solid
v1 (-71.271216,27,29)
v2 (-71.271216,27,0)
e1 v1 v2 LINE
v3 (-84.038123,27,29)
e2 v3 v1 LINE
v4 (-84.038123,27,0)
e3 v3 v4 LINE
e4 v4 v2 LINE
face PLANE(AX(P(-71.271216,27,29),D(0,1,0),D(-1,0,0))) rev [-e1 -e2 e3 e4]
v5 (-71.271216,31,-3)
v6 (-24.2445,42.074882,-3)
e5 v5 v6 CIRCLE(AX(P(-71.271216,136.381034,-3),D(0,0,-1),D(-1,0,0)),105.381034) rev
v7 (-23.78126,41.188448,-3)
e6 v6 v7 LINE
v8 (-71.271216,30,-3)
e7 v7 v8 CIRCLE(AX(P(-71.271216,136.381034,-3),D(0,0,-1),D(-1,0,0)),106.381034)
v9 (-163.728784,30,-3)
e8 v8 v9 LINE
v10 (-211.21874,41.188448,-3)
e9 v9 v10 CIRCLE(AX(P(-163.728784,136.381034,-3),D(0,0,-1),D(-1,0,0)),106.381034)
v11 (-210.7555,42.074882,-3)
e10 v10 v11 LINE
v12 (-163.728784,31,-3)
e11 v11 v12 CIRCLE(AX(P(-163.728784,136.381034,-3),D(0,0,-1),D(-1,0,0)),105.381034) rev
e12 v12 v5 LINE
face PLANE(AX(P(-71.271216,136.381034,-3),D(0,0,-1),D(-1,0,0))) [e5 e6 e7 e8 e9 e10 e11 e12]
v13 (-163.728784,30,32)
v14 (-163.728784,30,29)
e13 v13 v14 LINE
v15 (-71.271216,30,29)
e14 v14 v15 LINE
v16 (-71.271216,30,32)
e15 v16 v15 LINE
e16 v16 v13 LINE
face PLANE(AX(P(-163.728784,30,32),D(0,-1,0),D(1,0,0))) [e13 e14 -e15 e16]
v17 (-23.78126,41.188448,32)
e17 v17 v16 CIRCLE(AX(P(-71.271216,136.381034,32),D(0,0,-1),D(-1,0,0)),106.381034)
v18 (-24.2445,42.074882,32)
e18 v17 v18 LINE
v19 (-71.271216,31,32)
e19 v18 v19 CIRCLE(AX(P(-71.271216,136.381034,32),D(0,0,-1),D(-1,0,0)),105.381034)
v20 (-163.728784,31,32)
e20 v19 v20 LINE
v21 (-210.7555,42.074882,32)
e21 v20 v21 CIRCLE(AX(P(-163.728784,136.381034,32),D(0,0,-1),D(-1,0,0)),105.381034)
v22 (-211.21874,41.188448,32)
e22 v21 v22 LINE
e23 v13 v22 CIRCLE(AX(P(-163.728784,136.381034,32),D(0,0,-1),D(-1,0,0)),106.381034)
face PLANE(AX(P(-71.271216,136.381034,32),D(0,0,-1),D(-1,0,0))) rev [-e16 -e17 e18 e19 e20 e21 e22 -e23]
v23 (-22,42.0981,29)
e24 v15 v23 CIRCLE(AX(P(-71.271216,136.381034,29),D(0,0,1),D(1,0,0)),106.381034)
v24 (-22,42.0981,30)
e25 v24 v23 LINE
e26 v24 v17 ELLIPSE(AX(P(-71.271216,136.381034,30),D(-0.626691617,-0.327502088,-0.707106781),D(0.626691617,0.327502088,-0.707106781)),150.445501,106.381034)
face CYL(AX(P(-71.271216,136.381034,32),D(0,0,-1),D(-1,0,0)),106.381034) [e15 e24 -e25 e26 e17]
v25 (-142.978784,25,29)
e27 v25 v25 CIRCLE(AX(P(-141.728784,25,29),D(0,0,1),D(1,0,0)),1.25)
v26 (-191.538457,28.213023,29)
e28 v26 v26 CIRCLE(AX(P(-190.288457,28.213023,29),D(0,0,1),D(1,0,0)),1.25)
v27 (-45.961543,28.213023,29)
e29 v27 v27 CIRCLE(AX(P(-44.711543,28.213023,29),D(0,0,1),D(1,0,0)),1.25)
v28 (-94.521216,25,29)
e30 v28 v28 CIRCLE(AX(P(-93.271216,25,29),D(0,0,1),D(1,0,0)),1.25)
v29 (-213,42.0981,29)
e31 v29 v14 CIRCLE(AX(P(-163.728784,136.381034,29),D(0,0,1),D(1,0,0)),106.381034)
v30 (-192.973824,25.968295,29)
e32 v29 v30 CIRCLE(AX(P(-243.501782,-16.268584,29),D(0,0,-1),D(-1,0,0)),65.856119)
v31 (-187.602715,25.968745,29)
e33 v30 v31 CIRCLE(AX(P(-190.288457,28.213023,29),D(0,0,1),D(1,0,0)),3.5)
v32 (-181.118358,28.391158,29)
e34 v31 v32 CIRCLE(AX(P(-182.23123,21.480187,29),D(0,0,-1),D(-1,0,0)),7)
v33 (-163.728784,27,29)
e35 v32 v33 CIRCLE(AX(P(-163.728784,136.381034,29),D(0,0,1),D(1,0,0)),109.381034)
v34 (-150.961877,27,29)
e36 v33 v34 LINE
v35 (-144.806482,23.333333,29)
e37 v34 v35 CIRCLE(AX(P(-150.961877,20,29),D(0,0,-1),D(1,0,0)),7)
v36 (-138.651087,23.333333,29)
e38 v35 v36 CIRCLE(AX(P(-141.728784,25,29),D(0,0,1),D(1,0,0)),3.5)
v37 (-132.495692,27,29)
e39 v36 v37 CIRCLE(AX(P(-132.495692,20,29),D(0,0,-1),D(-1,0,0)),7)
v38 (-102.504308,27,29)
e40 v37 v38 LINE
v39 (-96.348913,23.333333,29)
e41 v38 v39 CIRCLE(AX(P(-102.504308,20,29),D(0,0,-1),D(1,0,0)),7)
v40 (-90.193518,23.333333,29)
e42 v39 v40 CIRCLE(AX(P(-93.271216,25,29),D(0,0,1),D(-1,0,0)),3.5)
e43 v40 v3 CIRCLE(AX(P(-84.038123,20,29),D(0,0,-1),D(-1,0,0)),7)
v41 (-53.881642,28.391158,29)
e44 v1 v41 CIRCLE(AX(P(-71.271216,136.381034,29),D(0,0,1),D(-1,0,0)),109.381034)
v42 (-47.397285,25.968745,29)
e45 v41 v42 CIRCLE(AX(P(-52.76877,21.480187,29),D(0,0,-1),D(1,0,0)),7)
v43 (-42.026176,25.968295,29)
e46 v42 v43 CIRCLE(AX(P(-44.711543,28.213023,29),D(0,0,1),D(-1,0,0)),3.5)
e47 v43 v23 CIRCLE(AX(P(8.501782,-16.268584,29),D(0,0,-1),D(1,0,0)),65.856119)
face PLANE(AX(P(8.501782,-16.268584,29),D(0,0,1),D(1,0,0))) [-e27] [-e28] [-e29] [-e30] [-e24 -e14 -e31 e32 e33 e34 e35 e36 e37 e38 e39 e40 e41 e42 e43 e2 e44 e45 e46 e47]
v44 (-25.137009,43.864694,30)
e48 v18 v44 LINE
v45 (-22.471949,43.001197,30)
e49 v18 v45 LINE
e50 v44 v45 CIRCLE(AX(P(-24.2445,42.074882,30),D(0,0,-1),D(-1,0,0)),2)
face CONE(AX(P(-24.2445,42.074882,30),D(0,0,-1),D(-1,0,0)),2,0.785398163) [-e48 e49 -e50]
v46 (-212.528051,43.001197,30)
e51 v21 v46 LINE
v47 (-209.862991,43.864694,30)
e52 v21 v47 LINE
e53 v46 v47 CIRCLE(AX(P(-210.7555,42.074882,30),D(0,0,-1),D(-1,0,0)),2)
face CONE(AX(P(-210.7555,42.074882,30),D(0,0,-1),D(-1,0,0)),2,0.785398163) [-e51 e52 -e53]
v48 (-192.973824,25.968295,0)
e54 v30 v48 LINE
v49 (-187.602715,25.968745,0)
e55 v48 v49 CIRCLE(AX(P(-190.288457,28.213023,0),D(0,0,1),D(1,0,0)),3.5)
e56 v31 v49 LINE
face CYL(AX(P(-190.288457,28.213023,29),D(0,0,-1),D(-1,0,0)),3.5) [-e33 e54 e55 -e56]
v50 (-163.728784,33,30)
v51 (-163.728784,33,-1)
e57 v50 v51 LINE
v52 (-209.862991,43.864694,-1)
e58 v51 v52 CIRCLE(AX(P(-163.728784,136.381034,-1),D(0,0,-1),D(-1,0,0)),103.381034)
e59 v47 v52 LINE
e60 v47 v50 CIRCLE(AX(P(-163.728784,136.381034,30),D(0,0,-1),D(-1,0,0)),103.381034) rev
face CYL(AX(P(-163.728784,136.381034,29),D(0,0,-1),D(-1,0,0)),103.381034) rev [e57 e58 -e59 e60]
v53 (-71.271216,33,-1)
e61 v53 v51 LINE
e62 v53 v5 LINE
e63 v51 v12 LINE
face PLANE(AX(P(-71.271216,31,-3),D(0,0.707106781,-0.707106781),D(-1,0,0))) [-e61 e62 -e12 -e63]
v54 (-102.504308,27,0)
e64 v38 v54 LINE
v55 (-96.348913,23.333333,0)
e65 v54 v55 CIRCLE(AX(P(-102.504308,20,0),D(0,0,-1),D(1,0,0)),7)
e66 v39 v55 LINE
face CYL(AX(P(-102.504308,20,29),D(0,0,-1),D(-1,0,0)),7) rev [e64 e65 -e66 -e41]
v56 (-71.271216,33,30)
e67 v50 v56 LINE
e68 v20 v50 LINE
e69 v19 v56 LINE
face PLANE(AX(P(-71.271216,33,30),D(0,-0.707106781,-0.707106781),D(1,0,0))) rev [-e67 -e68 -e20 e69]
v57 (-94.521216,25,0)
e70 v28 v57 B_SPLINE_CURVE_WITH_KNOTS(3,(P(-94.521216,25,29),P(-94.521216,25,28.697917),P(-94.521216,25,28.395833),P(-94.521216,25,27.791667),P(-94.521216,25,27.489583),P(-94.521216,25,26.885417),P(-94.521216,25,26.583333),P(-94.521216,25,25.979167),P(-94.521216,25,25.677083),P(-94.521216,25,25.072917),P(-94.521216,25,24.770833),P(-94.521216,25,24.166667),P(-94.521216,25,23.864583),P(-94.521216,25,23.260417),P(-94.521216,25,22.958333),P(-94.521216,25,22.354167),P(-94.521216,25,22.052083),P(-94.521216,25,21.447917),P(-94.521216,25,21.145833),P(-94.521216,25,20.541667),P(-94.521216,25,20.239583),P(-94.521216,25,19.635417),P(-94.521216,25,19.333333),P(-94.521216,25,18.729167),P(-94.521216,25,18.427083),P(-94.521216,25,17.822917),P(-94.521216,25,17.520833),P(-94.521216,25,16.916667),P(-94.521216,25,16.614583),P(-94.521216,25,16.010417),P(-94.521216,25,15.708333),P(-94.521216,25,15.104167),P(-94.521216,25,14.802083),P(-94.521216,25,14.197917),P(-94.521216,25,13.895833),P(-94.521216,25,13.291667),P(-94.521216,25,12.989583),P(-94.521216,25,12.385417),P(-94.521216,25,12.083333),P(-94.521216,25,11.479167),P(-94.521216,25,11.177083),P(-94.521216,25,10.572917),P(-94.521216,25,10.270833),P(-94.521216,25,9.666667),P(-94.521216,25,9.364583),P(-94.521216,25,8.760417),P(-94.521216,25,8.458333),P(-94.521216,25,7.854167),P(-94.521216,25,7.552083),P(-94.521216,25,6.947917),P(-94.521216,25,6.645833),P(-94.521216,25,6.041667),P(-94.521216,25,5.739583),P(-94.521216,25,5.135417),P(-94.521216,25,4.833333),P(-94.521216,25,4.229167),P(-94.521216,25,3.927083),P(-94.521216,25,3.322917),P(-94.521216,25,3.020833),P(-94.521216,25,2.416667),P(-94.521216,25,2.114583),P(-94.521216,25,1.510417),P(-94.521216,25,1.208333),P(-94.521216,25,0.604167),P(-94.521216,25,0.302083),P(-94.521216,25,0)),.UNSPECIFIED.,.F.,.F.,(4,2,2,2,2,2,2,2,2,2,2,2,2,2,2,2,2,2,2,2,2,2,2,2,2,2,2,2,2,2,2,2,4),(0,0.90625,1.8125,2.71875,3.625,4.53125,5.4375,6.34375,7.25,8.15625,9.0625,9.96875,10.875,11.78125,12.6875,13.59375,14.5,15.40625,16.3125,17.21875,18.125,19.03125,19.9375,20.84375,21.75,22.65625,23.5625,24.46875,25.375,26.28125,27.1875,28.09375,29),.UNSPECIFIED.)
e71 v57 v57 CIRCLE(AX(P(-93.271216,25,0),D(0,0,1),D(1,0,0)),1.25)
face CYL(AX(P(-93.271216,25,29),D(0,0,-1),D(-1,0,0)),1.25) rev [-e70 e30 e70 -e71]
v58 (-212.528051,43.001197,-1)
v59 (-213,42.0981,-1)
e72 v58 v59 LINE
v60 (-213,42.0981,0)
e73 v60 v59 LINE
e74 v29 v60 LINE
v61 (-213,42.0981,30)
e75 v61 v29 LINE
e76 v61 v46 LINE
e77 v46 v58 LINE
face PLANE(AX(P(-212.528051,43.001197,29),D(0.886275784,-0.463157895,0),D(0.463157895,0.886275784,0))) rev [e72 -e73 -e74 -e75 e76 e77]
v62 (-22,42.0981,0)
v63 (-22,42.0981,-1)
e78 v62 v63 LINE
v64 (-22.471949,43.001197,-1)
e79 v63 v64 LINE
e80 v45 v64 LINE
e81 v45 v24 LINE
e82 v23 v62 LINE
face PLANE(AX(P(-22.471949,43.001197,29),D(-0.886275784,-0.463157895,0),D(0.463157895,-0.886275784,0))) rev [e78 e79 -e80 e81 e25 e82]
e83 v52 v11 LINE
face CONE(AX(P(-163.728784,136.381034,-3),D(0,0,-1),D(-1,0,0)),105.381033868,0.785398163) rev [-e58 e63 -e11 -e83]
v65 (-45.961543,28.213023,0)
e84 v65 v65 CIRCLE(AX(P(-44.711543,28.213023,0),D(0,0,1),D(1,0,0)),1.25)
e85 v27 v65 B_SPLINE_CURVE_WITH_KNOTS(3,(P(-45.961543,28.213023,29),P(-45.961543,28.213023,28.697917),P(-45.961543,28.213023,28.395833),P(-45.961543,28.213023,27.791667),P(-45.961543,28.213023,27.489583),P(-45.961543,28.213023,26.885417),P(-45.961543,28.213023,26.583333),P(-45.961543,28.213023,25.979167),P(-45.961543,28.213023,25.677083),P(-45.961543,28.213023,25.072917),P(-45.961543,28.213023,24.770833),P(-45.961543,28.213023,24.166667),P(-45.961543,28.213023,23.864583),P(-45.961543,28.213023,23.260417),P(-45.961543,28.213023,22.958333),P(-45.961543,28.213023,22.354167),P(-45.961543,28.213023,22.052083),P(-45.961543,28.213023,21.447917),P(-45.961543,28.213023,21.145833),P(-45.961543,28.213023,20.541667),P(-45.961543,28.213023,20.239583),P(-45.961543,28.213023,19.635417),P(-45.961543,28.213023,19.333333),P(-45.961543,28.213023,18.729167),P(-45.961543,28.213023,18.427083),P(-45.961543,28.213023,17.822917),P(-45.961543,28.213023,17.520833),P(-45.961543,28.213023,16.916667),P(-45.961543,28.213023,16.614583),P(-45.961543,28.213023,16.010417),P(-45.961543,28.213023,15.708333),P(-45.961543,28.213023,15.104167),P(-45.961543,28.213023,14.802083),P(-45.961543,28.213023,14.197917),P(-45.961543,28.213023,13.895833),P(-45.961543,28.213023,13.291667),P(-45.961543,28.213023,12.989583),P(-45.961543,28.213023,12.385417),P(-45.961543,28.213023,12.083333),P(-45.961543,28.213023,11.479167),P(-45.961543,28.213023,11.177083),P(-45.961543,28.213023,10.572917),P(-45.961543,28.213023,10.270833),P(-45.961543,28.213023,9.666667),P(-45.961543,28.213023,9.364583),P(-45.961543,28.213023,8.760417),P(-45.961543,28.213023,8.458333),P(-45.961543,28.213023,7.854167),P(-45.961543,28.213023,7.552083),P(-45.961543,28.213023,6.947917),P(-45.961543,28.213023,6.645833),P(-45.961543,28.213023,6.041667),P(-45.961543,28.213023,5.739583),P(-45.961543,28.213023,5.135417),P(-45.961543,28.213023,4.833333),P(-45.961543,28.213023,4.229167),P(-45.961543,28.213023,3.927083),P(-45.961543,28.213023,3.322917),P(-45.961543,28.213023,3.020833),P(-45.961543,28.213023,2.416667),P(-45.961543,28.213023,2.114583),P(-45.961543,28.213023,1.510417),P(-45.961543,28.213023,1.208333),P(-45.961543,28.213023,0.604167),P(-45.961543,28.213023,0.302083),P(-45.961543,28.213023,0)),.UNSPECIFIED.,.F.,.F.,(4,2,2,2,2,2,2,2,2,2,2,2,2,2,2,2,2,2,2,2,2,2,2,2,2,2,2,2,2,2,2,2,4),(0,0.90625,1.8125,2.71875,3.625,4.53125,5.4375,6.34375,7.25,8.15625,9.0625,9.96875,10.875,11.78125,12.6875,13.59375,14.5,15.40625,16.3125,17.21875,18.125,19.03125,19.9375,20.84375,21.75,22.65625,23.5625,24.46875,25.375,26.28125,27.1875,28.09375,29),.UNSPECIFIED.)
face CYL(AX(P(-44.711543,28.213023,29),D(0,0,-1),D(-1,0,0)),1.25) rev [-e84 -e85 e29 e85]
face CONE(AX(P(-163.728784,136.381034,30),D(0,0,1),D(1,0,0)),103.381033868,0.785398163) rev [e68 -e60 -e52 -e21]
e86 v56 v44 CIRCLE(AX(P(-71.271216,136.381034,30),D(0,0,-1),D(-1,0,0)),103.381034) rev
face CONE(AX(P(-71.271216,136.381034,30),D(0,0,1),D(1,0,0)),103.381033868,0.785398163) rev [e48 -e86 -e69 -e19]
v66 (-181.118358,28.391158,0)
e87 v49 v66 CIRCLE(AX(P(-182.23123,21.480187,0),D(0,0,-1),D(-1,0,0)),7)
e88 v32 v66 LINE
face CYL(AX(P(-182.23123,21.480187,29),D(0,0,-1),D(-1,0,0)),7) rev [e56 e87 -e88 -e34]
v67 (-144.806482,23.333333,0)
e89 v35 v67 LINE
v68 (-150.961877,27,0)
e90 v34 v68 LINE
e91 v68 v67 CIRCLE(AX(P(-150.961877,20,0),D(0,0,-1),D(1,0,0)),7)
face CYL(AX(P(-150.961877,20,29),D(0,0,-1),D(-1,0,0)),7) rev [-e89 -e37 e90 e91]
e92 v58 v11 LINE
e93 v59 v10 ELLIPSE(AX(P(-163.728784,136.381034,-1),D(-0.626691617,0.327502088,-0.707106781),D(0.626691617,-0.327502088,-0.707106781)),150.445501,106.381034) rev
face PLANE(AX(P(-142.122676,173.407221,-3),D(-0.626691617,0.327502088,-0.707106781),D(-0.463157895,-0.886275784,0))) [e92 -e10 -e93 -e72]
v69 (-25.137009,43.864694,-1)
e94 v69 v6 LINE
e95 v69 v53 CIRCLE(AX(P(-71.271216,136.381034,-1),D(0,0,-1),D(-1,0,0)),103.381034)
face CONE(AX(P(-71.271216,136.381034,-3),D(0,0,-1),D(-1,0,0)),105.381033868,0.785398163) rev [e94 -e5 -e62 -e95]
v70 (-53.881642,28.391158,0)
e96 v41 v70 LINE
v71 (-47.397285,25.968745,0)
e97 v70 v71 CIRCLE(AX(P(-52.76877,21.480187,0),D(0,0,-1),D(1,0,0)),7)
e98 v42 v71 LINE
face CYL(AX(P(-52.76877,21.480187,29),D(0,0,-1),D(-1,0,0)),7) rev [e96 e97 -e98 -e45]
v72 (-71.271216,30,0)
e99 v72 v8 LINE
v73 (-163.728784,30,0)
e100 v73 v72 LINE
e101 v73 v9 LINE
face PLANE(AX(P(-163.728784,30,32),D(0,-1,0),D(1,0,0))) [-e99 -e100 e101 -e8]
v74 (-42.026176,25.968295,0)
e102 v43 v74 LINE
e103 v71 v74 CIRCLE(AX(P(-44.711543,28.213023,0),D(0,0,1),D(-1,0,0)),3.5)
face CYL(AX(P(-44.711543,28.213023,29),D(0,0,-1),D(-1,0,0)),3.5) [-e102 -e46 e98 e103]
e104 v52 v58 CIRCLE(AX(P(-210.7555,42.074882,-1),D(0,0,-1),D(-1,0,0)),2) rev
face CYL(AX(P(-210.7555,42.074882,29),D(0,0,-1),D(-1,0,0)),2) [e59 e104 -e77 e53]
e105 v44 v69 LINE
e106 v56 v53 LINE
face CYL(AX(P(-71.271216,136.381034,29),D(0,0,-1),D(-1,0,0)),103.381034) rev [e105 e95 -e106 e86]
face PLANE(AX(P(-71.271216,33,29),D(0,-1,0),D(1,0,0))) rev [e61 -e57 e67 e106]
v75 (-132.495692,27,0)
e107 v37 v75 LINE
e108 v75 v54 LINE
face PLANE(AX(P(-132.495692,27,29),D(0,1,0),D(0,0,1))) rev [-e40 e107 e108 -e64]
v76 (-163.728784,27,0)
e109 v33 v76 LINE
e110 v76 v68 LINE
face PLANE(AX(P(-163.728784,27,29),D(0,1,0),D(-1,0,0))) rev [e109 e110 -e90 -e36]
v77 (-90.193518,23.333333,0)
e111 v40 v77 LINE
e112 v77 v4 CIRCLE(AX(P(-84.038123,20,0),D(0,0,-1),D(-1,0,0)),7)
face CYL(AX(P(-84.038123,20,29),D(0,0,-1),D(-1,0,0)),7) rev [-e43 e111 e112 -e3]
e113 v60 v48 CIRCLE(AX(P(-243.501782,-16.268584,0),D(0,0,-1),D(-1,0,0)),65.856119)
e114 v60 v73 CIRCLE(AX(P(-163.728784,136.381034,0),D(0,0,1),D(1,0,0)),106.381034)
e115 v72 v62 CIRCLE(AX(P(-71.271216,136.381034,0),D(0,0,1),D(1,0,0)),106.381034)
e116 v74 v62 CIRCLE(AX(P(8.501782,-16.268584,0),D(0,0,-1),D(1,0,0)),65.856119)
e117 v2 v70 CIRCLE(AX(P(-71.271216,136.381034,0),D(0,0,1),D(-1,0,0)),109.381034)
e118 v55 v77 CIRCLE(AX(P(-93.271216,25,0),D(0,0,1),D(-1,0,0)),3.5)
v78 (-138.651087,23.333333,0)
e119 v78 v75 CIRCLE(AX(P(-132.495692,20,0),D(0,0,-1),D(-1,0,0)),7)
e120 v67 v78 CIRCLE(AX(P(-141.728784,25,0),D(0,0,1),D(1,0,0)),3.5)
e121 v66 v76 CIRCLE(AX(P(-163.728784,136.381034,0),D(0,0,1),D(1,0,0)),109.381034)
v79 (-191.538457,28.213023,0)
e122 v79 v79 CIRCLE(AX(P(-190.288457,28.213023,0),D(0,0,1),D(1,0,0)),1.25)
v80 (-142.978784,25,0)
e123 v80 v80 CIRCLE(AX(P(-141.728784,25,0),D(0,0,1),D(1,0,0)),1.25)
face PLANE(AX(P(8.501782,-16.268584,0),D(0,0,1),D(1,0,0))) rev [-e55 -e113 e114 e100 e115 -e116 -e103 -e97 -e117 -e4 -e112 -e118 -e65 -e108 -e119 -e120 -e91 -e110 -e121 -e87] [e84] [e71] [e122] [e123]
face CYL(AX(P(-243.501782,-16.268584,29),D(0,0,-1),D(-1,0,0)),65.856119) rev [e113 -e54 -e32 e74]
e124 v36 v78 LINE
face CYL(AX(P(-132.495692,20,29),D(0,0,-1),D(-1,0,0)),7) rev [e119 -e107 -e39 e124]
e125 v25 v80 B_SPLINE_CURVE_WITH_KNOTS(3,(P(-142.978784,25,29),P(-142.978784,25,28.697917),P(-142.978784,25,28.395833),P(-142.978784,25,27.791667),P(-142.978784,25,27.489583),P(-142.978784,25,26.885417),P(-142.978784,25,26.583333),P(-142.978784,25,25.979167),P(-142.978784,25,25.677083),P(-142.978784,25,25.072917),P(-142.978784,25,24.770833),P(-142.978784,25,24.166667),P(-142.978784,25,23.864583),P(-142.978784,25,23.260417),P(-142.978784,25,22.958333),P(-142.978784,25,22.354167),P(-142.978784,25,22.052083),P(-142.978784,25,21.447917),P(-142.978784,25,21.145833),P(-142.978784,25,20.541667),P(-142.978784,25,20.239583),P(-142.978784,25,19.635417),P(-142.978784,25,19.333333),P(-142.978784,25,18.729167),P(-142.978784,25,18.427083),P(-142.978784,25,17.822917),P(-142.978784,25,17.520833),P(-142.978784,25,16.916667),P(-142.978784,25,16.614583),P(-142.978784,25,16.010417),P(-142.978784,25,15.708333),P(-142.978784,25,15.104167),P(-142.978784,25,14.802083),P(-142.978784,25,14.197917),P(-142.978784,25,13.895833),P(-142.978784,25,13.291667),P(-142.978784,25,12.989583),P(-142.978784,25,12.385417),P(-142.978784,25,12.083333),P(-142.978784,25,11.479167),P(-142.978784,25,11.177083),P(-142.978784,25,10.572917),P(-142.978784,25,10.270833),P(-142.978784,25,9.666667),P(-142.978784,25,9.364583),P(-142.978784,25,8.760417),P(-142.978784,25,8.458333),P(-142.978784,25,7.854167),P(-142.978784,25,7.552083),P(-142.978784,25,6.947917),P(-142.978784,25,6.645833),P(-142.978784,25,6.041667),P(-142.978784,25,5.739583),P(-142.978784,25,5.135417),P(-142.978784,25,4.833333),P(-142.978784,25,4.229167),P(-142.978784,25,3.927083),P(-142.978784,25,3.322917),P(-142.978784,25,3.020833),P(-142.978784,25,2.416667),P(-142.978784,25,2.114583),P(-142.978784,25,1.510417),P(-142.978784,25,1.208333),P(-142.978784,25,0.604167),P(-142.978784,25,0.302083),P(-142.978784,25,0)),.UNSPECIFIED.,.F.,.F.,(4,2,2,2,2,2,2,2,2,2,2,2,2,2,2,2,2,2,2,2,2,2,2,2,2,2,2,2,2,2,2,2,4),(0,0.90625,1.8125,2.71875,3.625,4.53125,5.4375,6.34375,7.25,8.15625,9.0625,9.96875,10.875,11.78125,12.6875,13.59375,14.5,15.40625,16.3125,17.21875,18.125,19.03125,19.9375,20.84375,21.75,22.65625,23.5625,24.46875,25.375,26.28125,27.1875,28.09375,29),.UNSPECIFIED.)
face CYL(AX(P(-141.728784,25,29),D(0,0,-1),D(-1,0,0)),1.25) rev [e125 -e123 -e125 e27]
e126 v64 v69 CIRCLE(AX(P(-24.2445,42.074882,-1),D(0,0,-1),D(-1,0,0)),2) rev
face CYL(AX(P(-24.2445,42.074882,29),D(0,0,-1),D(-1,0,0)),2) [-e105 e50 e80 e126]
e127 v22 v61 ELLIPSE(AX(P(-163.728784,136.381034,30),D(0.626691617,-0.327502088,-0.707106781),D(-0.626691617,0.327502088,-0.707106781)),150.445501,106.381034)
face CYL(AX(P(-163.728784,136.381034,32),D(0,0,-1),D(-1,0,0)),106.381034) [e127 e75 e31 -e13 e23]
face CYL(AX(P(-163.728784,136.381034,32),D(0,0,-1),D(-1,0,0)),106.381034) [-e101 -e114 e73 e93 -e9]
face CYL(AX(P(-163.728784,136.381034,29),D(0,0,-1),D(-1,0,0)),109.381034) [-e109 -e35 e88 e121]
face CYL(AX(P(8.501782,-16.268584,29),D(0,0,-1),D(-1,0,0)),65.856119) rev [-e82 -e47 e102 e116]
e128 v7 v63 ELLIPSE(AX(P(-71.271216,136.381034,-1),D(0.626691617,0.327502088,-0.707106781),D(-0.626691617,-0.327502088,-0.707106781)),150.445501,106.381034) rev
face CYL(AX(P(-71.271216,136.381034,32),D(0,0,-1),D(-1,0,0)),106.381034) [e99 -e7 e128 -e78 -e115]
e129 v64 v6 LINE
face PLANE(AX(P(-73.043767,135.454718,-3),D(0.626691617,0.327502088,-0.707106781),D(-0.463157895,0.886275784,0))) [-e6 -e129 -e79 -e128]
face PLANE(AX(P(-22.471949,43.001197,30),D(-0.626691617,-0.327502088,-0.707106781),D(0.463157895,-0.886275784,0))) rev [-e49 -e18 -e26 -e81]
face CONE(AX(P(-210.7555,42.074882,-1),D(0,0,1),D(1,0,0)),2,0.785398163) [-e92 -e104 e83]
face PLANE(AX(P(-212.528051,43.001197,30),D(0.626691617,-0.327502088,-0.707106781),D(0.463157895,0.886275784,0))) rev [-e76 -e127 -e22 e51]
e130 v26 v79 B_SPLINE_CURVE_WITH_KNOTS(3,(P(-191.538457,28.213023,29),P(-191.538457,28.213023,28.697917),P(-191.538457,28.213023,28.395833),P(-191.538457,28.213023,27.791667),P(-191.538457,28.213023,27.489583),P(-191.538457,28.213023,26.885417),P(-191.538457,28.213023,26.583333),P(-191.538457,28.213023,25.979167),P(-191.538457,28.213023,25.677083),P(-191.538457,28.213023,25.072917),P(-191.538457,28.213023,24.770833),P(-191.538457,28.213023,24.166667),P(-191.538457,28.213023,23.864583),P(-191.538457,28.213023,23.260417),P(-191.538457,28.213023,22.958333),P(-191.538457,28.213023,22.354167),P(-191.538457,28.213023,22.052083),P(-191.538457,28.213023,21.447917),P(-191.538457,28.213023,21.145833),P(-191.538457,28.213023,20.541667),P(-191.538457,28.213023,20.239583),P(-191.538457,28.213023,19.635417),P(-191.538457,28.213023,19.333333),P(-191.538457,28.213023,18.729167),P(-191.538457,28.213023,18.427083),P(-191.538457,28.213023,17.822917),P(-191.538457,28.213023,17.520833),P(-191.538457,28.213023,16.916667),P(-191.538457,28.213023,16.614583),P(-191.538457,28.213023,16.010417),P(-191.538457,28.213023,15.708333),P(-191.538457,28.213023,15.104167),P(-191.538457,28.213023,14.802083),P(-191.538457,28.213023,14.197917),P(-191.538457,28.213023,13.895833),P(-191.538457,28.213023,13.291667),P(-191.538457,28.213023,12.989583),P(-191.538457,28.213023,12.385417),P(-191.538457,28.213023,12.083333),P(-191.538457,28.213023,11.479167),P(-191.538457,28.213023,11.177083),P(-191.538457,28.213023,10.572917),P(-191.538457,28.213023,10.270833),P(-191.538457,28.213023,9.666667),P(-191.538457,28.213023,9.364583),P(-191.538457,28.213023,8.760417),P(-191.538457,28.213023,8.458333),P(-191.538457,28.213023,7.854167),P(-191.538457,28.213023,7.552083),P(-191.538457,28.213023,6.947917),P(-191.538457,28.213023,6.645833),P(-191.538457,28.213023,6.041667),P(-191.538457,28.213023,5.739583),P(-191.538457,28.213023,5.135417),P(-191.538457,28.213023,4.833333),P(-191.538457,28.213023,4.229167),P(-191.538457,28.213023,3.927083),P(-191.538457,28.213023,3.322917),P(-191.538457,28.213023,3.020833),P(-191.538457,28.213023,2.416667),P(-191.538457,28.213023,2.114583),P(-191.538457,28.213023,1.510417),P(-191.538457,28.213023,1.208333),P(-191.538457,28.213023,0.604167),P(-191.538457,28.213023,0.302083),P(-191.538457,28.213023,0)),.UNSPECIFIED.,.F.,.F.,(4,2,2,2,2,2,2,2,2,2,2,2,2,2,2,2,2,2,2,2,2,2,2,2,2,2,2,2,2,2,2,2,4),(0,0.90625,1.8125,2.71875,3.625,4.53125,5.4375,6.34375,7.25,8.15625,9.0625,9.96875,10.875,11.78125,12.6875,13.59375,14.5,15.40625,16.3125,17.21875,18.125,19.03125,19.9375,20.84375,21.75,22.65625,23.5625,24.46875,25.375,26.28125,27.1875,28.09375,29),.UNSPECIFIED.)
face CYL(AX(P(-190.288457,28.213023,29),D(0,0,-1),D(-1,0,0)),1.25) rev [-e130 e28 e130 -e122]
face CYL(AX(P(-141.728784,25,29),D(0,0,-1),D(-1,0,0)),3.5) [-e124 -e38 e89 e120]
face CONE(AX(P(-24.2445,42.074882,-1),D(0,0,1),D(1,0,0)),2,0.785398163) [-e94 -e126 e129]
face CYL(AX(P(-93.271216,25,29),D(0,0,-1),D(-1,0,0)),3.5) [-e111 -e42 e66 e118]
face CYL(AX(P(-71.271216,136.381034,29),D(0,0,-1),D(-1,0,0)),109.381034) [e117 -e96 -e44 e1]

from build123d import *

# Parameters (mm, degrees)
SKETCH_1_R           = 1.25
EXTRUDE_1_DEPTH      = 29
EXTRUDE_2_DEPTH      = 3
EXTRUDE_2_DEPTH_BACK = 32
CHAMFER_1_SIZE       = 2


with BuildPart() as part:
    # 草图1 → 凸台-拉伸1 (new body)
    with BuildSketch(Plane.XY):
        with BuildLine():
            Line((-71.271215686, 33), (-163.728784314, 33))
            ThreePointArc((-163.728784314, 33), (-187.426920576, 35.752824596), (-209.86299145, 43.864694254))
            ThreePointArc((-209.86299145, 43.864694254), (-211.371961919, 43.977504611), (-212.528051157, 43.001197422))
            Line((-212.528051157, 43.001197422), (-213, 42.09809972))
            ThreePointArc((-213, 42.09809972), (-202.192009237, 35.020119991), (-192.973824319, 25.968295413))
            ThreePointArc((-192.973824319, 25.968295413), (-190.288164523, 24.71302347), (-187.602714776, 25.968744715))
            ThreePointArc((-187.602714776, 25.968744715), (-184.680917301, 28.037551849), (-181.118358374, 28.391158027))
            ThreePointArc((-181.118358374, 28.391158027), (-172.451349972, 27.34834419), (-163.728784314, 27))
            Line((-163.728784314, 27), (-150.96187697, 27))
            ThreePointArc((-150.96187697, 27), (-147.37951276, 26.013872851), (-144.806481866, 23.333333333))
            ThreePointArc((-144.806481866, 23.333333333), (-141.728784314, 21.5), (-138.651086762, 23.333333333))
            ThreePointArc((-138.651086762, 23.333333333), (-136.078055868, 26.013872851), (-132.495691658, 27))
            Line((-132.495691658, 27), (-102.504308342, 27))
            ThreePointArc((-102.504308342, 27), (-98.921944132, 26.013872851), (-96.348913238, 23.333333333))
            ThreePointArc((-96.348913238, 23.333333333), (-93.271215686, 21.5), (-90.193518134, 23.333333333))
            ThreePointArc((-90.193518134, 23.333333333), (-87.62048724, 26.013872851), (-84.03812303, 27))
            Line((-84.03812303, 27), (-71.271215686, 27))
            ThreePointArc((-71.271215686, 27), (-62.548650028, 27.34834419), (-53.881641626, 28.391158027))
            ThreePointArc((-53.881641626, 28.391158027), (-50.319082699, 28.037551849), (-47.397285224, 25.968744715))
            ThreePointArc((-47.397285224, 25.968744715), (-44.711835477, 24.71302347), (-42.026175681, 25.968295413))
            ThreePointArc((-42.026175681, 25.968295413), (-32.807990763, 35.020119991), (-22, 42.09809972))
            Line((-22, 42.09809972), (-22.471948843, 43.001197422))
            ThreePointArc((-22.471948843, 43.001197422), (-23.628038081, 43.977504611), (-25.13700855, 43.864694254))
            ThreePointArc((-25.13700855, 43.864694254), (-47.573079424, 35.752824596), (-71.271215686, 33))
        make_face()
        with Locations(Location((-44.711542697, 28.213023457, 0), (0, 0, 180))):
            Circle(SKETCH_1_R, mode=Mode.SUBTRACT)
        with Locations(Location((-93.271215686, 25, 0), (0, 0, 180))):
            Circle(SKETCH_1_R, mode=Mode.SUBTRACT)
        with Locations(Location((-141.728784314, 25, 0), (0, 0, 180))):
            Circle(SKETCH_1_R, mode=Mode.SUBTRACT)
        with Locations(Location((-190.288457303, 28.213023457, 0), (0, 0, 180))):
            Circle(SKETCH_1_R, mode=Mode.SUBTRACT)
    extrude(amount=EXTRUDE_1_DEPTH)

    # 草图2 → 凸台-拉伸2 (add, two sides: drawn at the far end of the back side and taken through both)
    with BuildSketch(Plane(origin=(0, 0, 0), x_dir=(-1, 0, 0), z_dir=(0, 0, -1)).offset(-EXTRUDE_2_DEPTH_BACK)):
        with BuildLine():
            Line((163.728784314, 30), (71.271215686, 30))
            ThreePointArc((71.271215686, 30), (45.903831548, 33.068787794), (22, 42.09809972))
            Line((22, 42.09809972), (22.471948843, 43.001197422))
            ThreePointArc((22.471948843, 43.001197422), (23.628038081, 43.977504611), (25.13700855, 43.864694254))
            ThreePointArc((25.13700855, 43.864694254), (47.573079424, 35.752824596), (71.271215686, 33))
            Line((71.271215686, 33), (163.728784314, 33))
            ThreePointArc((163.728784314, 33), (187.426920576, 35.752824596), (209.86299145, 43.864694254))
            ThreePointArc((209.86299145, 43.864694254), (211.371961919, 43.977504611), (212.528051157, 43.001197422))
            Line((212.528051157, 43.001197422), (213, 42.09809972))
            ThreePointArc((213, 42.09809972), (189.096168452, 33.068787794), (163.728784314, 30))
        make_face()
    extrude(amount=EXTRUDE_2_DEPTH + EXTRUDE_2_DEPTH_BACK)

    # 倒角1
    chamfer_1_edges = [part.edges().sort_by_distance(p)[0] for p in [
        (-22.235974422, 42.549648571, 32),
        (-23.628038081, 43.977504611, 32),
        (-47.573079424, 35.752824596, 32),
        (-117.5, 33, 32),
        (-187.426920576, 35.752824596, 32),
        (-211.371961919, 43.977504611, 32),
        (-212.764025578, 42.549648571, 32),
        (-212.764025578, 42.549648571, -3),
        (-211.371961919, 43.977504611, -3),
        (-187.426920576, 35.752824596, -3),
        (-117.5, 33, -3),
        (-47.573079424, 35.752824596, -3),
        (-23.628038081, 43.977504611, -3),
        (-22.235974422, 42.549648571, -3),
    ]]
    chamfer(chamfer_1_edges, length=CHAMFER_1_SIZE - 0.0001)  # a hair under: the kernel refuses the full size


solid = part.part
